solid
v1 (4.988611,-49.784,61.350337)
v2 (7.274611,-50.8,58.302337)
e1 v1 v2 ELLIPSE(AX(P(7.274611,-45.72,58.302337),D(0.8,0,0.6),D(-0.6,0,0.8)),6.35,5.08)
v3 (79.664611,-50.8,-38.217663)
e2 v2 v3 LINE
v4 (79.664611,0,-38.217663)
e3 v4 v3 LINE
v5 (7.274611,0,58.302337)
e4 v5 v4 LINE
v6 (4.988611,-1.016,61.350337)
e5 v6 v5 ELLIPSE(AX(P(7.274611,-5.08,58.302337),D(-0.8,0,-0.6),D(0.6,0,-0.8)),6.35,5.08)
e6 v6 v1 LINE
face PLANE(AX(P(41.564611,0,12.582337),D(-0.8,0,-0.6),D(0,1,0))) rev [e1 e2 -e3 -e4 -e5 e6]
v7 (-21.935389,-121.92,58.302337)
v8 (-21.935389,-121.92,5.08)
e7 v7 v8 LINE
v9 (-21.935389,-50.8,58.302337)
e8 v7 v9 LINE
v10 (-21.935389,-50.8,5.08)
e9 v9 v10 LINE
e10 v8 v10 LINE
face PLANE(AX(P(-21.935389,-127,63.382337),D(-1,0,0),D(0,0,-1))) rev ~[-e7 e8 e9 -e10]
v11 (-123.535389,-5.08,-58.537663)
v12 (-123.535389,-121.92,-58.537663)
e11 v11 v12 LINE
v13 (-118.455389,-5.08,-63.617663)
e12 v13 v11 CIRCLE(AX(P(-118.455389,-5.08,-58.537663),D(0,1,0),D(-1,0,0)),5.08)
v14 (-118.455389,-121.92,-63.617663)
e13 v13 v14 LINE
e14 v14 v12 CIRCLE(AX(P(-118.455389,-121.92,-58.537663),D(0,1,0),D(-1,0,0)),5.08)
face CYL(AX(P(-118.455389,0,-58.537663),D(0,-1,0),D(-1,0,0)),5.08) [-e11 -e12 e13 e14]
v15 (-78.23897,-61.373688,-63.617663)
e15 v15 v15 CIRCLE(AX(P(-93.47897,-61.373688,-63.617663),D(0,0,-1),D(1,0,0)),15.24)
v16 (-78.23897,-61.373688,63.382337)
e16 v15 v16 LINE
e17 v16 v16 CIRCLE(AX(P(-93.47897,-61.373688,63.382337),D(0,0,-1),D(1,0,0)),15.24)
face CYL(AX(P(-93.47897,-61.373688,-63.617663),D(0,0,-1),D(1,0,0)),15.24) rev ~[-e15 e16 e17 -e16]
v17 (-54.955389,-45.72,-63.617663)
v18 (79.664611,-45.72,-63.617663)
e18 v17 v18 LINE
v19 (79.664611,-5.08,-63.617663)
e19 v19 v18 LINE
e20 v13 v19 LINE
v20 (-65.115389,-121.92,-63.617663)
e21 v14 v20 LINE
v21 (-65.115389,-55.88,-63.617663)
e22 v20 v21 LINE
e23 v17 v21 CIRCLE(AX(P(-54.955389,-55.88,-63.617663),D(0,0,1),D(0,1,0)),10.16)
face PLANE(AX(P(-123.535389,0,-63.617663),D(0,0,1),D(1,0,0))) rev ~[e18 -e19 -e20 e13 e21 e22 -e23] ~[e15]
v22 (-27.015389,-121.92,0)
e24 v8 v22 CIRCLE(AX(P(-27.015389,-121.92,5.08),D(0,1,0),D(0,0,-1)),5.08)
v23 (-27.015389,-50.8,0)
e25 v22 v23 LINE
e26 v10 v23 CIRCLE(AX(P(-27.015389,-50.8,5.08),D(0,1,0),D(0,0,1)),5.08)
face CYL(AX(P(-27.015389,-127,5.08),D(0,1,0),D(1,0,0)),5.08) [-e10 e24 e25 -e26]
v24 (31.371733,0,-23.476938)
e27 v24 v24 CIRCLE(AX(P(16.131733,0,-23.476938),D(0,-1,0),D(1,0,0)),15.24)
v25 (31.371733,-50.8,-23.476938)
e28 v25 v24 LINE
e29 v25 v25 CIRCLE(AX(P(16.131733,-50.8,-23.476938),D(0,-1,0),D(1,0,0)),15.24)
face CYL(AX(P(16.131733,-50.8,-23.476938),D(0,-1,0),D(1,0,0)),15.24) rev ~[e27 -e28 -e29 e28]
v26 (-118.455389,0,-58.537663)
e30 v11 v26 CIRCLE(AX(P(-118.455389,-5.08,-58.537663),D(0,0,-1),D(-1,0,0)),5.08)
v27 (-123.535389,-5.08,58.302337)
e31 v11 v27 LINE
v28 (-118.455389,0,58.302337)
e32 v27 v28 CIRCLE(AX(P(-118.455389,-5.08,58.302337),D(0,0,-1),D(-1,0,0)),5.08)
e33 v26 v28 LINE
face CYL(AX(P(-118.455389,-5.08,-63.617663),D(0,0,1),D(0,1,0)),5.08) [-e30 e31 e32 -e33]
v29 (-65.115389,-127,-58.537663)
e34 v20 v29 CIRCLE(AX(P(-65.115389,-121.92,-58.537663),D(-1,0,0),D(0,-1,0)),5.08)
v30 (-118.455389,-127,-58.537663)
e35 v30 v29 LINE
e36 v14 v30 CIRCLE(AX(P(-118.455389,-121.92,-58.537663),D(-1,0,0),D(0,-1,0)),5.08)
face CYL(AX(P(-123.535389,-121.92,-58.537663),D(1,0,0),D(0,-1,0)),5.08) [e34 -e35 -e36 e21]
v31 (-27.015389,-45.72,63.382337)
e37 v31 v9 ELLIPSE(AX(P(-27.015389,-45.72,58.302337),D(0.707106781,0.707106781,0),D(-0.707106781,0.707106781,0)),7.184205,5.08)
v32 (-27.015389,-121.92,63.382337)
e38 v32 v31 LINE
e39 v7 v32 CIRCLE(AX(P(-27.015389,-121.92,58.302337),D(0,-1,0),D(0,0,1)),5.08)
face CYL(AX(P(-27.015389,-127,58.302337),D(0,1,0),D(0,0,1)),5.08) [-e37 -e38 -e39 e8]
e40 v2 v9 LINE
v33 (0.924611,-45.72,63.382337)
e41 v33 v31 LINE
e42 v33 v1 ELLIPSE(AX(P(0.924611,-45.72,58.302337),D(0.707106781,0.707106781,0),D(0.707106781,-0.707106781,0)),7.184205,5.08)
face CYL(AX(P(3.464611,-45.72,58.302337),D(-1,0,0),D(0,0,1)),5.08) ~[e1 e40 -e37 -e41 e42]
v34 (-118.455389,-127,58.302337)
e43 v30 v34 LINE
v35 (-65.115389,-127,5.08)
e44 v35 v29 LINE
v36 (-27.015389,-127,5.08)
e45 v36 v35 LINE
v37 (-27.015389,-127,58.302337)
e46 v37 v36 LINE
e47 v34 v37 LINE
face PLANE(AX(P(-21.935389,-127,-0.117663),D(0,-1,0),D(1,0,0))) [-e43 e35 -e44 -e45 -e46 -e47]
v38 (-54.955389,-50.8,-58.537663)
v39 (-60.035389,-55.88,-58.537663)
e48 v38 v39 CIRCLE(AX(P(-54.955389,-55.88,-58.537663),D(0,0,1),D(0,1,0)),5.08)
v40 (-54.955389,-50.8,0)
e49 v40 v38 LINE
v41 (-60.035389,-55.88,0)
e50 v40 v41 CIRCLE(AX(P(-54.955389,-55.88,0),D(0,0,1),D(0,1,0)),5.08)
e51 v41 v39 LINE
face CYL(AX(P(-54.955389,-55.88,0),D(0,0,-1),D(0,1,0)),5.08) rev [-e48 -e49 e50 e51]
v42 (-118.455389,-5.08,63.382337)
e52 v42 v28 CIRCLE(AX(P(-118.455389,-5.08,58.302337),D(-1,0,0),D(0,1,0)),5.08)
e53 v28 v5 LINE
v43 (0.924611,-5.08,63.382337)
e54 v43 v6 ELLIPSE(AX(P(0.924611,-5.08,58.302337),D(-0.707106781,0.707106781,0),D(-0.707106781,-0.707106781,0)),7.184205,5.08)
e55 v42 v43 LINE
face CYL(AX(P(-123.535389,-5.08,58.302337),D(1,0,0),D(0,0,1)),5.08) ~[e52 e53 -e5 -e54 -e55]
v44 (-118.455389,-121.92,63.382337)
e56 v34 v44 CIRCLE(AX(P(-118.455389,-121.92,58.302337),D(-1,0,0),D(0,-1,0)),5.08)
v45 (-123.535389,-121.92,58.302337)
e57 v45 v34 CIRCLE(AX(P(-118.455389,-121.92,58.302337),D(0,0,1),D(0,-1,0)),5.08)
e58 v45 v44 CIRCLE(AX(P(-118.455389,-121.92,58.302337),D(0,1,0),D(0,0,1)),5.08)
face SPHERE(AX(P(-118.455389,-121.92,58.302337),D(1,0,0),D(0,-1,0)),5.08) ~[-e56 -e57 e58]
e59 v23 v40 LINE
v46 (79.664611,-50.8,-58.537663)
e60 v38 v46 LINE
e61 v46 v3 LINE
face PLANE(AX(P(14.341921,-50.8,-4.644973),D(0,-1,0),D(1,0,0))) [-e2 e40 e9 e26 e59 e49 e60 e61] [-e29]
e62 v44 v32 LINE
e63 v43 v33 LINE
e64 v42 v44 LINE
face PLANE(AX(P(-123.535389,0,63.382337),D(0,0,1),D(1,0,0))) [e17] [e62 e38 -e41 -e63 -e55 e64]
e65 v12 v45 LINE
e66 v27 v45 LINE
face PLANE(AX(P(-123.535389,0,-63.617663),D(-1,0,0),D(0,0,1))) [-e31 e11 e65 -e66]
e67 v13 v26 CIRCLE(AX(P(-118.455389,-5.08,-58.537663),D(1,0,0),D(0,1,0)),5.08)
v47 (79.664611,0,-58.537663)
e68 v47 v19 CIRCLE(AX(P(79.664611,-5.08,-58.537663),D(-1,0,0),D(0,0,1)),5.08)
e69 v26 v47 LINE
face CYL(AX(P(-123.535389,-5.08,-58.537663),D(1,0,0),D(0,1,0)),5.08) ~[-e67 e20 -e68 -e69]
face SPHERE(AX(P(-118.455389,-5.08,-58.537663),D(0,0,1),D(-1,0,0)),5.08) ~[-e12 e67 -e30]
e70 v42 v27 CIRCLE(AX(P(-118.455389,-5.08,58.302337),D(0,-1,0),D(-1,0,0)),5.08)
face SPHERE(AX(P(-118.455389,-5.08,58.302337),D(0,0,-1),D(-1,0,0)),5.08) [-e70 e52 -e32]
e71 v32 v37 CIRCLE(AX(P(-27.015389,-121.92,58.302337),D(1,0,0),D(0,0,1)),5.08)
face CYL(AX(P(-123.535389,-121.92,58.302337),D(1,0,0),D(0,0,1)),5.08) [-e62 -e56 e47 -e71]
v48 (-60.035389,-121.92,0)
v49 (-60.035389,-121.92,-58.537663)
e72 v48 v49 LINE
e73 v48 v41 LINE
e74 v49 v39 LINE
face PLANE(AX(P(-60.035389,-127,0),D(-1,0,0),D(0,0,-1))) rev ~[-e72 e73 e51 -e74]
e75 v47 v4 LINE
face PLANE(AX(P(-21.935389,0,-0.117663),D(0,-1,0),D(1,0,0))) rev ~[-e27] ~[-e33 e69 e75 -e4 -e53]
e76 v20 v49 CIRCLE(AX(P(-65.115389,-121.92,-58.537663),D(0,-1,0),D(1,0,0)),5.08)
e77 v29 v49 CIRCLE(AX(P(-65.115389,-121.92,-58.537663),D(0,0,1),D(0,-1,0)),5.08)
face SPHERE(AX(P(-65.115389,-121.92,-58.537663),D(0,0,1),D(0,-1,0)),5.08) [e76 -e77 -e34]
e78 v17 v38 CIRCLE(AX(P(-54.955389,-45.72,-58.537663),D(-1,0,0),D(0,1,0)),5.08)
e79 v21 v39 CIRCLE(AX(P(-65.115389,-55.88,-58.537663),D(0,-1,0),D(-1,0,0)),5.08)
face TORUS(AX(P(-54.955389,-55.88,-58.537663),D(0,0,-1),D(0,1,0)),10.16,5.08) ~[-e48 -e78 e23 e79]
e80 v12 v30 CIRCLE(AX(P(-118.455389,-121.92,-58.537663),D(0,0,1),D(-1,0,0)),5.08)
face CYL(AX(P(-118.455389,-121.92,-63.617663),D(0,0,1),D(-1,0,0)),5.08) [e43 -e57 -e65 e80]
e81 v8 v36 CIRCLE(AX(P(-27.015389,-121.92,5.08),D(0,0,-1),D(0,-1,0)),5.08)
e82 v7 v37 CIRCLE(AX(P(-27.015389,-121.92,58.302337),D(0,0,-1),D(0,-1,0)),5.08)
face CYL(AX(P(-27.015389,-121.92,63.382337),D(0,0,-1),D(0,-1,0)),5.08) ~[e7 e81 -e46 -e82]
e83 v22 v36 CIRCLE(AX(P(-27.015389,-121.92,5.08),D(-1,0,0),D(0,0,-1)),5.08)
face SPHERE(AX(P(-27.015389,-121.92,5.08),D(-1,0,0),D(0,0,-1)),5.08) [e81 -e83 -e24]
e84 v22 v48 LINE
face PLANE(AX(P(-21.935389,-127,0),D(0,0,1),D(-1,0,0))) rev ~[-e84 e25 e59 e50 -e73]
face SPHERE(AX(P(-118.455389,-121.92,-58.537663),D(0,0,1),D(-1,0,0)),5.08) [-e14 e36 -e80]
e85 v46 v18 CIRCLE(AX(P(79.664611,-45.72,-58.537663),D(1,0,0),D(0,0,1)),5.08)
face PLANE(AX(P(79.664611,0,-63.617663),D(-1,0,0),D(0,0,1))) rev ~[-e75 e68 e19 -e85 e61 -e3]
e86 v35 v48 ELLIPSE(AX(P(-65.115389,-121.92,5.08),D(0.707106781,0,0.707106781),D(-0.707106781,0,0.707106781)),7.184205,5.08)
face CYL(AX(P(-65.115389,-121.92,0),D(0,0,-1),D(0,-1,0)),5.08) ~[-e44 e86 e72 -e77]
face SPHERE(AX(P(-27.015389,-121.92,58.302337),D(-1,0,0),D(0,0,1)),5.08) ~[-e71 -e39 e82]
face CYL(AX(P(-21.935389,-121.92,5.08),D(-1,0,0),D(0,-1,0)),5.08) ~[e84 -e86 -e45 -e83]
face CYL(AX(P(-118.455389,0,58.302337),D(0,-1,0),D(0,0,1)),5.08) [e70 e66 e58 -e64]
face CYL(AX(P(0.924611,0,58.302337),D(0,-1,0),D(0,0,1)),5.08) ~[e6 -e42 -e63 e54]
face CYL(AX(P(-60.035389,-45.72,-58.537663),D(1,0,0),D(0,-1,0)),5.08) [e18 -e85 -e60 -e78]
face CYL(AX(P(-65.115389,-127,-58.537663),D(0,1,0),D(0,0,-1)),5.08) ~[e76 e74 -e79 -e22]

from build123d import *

# Parameters (mm, degrees)
F0_W     = 203.2
F0_H     = 127
F1_DEPTH = 127
F3_DEPTH = 76.2
F4_SIZE2 = 101.6
F4_SIZE  = 76.2
F5_R     = 5.08
F6_R     = 15.24
F7_DEPTH = 50.8
F8_R     = 15.24
F9_DEPTH = 127


with BuildPart() as f1:
    # F0 (on Front) → F1 (new body)
    with BuildSketch(Plane.XZ):
        with Locations((-21.9353889487, -0.1176632941)):
            Rectangle(F0_W, F0_H)
    extrude(amount=F1_DEPTH)

    # F2 (on face) → F3 (cut)
    with BuildSketch(Plane.XZ.offset(127)):
        Polygon((79.6646110513, 63.3823367059), (-21.9353889487, 63.3823367059), (-21.9353889487, 0), (-60.0353889487, 0), (-60.0353889487, -63.6176632941), (79.6646110513, -63.6176632941), align=None)
    extrude(amount=-F3_DEPTH, mode=Mode.SUBTRACT)

    # F4
    f4_edges = [f1.edges().sort_by_distance(p)[0] for p in [
        (79.664611, -25.4, 63.382337),
    ]]
    f4_side = f1.faces().sort_by_distance((-43.706818, -52.614286, 63.382337))[0]
    chamfer(f4_edges, length=F4_SIZE, length2=F4_SIZE2, reference=f4_side)

    # F5
    f5_edges = [f1.edges().sort_by_distance(p)[0] for p in [
        (-72.735389, -127, 63.382337),
        (-21.935389, -88.9, 63.382337),
        (-40.985389, -127, 0),
        (-21.935389, -88.9, 0),
        (-21.935389, -127, 31.691168),
        (-60.035389, -127, -31.808832),
        (-60.035389, -50.8, -31.808832),
        (9.814611, -50.8, -63.617663),
        (3.464611, -25.4, 63.382337),
        (-9.235389, -50.8, 63.382337),
        (-123.535389, -127, -0.117663),
        (-123.535389, 0, -0.117663),
        (-123.535389, -63.5, -63.617663),
        (-123.535389, -63.5, 63.382337),
        (-21.935389, 0, -63.617663),
        (-60.035389, 0, 63.382337),
        (-91.785389, -127, -63.617663),
        (-60.035389, -88.9, -63.617663),
    ]]
    fillet(f5_edges, radius=F5_R)

    # F6 (on face) → F7 (cut, through all)
    with BuildSketch(Plane.XZ.offset(50.8)):
        with Locations((16.1317326128, -23.4769377857)):
            Circle(F6_R)
    extrude(amount=-F7_DEPTH, mode=Mode.SUBTRACT)

    # F8 (on face) → F9 (cut, through all)
    with BuildSketch(Plane(origin=(0, 0, -63.6176632941), x_dir=(1, 0, 0), z_dir=(0, 0, -1))):
        with Locations((-93.4789702296, 61.3736882806)):
            Circle(F8_R)
    extrude(amount=-F9_DEPTH, mode=Mode.SUBTRACT)


solid = f1.part
